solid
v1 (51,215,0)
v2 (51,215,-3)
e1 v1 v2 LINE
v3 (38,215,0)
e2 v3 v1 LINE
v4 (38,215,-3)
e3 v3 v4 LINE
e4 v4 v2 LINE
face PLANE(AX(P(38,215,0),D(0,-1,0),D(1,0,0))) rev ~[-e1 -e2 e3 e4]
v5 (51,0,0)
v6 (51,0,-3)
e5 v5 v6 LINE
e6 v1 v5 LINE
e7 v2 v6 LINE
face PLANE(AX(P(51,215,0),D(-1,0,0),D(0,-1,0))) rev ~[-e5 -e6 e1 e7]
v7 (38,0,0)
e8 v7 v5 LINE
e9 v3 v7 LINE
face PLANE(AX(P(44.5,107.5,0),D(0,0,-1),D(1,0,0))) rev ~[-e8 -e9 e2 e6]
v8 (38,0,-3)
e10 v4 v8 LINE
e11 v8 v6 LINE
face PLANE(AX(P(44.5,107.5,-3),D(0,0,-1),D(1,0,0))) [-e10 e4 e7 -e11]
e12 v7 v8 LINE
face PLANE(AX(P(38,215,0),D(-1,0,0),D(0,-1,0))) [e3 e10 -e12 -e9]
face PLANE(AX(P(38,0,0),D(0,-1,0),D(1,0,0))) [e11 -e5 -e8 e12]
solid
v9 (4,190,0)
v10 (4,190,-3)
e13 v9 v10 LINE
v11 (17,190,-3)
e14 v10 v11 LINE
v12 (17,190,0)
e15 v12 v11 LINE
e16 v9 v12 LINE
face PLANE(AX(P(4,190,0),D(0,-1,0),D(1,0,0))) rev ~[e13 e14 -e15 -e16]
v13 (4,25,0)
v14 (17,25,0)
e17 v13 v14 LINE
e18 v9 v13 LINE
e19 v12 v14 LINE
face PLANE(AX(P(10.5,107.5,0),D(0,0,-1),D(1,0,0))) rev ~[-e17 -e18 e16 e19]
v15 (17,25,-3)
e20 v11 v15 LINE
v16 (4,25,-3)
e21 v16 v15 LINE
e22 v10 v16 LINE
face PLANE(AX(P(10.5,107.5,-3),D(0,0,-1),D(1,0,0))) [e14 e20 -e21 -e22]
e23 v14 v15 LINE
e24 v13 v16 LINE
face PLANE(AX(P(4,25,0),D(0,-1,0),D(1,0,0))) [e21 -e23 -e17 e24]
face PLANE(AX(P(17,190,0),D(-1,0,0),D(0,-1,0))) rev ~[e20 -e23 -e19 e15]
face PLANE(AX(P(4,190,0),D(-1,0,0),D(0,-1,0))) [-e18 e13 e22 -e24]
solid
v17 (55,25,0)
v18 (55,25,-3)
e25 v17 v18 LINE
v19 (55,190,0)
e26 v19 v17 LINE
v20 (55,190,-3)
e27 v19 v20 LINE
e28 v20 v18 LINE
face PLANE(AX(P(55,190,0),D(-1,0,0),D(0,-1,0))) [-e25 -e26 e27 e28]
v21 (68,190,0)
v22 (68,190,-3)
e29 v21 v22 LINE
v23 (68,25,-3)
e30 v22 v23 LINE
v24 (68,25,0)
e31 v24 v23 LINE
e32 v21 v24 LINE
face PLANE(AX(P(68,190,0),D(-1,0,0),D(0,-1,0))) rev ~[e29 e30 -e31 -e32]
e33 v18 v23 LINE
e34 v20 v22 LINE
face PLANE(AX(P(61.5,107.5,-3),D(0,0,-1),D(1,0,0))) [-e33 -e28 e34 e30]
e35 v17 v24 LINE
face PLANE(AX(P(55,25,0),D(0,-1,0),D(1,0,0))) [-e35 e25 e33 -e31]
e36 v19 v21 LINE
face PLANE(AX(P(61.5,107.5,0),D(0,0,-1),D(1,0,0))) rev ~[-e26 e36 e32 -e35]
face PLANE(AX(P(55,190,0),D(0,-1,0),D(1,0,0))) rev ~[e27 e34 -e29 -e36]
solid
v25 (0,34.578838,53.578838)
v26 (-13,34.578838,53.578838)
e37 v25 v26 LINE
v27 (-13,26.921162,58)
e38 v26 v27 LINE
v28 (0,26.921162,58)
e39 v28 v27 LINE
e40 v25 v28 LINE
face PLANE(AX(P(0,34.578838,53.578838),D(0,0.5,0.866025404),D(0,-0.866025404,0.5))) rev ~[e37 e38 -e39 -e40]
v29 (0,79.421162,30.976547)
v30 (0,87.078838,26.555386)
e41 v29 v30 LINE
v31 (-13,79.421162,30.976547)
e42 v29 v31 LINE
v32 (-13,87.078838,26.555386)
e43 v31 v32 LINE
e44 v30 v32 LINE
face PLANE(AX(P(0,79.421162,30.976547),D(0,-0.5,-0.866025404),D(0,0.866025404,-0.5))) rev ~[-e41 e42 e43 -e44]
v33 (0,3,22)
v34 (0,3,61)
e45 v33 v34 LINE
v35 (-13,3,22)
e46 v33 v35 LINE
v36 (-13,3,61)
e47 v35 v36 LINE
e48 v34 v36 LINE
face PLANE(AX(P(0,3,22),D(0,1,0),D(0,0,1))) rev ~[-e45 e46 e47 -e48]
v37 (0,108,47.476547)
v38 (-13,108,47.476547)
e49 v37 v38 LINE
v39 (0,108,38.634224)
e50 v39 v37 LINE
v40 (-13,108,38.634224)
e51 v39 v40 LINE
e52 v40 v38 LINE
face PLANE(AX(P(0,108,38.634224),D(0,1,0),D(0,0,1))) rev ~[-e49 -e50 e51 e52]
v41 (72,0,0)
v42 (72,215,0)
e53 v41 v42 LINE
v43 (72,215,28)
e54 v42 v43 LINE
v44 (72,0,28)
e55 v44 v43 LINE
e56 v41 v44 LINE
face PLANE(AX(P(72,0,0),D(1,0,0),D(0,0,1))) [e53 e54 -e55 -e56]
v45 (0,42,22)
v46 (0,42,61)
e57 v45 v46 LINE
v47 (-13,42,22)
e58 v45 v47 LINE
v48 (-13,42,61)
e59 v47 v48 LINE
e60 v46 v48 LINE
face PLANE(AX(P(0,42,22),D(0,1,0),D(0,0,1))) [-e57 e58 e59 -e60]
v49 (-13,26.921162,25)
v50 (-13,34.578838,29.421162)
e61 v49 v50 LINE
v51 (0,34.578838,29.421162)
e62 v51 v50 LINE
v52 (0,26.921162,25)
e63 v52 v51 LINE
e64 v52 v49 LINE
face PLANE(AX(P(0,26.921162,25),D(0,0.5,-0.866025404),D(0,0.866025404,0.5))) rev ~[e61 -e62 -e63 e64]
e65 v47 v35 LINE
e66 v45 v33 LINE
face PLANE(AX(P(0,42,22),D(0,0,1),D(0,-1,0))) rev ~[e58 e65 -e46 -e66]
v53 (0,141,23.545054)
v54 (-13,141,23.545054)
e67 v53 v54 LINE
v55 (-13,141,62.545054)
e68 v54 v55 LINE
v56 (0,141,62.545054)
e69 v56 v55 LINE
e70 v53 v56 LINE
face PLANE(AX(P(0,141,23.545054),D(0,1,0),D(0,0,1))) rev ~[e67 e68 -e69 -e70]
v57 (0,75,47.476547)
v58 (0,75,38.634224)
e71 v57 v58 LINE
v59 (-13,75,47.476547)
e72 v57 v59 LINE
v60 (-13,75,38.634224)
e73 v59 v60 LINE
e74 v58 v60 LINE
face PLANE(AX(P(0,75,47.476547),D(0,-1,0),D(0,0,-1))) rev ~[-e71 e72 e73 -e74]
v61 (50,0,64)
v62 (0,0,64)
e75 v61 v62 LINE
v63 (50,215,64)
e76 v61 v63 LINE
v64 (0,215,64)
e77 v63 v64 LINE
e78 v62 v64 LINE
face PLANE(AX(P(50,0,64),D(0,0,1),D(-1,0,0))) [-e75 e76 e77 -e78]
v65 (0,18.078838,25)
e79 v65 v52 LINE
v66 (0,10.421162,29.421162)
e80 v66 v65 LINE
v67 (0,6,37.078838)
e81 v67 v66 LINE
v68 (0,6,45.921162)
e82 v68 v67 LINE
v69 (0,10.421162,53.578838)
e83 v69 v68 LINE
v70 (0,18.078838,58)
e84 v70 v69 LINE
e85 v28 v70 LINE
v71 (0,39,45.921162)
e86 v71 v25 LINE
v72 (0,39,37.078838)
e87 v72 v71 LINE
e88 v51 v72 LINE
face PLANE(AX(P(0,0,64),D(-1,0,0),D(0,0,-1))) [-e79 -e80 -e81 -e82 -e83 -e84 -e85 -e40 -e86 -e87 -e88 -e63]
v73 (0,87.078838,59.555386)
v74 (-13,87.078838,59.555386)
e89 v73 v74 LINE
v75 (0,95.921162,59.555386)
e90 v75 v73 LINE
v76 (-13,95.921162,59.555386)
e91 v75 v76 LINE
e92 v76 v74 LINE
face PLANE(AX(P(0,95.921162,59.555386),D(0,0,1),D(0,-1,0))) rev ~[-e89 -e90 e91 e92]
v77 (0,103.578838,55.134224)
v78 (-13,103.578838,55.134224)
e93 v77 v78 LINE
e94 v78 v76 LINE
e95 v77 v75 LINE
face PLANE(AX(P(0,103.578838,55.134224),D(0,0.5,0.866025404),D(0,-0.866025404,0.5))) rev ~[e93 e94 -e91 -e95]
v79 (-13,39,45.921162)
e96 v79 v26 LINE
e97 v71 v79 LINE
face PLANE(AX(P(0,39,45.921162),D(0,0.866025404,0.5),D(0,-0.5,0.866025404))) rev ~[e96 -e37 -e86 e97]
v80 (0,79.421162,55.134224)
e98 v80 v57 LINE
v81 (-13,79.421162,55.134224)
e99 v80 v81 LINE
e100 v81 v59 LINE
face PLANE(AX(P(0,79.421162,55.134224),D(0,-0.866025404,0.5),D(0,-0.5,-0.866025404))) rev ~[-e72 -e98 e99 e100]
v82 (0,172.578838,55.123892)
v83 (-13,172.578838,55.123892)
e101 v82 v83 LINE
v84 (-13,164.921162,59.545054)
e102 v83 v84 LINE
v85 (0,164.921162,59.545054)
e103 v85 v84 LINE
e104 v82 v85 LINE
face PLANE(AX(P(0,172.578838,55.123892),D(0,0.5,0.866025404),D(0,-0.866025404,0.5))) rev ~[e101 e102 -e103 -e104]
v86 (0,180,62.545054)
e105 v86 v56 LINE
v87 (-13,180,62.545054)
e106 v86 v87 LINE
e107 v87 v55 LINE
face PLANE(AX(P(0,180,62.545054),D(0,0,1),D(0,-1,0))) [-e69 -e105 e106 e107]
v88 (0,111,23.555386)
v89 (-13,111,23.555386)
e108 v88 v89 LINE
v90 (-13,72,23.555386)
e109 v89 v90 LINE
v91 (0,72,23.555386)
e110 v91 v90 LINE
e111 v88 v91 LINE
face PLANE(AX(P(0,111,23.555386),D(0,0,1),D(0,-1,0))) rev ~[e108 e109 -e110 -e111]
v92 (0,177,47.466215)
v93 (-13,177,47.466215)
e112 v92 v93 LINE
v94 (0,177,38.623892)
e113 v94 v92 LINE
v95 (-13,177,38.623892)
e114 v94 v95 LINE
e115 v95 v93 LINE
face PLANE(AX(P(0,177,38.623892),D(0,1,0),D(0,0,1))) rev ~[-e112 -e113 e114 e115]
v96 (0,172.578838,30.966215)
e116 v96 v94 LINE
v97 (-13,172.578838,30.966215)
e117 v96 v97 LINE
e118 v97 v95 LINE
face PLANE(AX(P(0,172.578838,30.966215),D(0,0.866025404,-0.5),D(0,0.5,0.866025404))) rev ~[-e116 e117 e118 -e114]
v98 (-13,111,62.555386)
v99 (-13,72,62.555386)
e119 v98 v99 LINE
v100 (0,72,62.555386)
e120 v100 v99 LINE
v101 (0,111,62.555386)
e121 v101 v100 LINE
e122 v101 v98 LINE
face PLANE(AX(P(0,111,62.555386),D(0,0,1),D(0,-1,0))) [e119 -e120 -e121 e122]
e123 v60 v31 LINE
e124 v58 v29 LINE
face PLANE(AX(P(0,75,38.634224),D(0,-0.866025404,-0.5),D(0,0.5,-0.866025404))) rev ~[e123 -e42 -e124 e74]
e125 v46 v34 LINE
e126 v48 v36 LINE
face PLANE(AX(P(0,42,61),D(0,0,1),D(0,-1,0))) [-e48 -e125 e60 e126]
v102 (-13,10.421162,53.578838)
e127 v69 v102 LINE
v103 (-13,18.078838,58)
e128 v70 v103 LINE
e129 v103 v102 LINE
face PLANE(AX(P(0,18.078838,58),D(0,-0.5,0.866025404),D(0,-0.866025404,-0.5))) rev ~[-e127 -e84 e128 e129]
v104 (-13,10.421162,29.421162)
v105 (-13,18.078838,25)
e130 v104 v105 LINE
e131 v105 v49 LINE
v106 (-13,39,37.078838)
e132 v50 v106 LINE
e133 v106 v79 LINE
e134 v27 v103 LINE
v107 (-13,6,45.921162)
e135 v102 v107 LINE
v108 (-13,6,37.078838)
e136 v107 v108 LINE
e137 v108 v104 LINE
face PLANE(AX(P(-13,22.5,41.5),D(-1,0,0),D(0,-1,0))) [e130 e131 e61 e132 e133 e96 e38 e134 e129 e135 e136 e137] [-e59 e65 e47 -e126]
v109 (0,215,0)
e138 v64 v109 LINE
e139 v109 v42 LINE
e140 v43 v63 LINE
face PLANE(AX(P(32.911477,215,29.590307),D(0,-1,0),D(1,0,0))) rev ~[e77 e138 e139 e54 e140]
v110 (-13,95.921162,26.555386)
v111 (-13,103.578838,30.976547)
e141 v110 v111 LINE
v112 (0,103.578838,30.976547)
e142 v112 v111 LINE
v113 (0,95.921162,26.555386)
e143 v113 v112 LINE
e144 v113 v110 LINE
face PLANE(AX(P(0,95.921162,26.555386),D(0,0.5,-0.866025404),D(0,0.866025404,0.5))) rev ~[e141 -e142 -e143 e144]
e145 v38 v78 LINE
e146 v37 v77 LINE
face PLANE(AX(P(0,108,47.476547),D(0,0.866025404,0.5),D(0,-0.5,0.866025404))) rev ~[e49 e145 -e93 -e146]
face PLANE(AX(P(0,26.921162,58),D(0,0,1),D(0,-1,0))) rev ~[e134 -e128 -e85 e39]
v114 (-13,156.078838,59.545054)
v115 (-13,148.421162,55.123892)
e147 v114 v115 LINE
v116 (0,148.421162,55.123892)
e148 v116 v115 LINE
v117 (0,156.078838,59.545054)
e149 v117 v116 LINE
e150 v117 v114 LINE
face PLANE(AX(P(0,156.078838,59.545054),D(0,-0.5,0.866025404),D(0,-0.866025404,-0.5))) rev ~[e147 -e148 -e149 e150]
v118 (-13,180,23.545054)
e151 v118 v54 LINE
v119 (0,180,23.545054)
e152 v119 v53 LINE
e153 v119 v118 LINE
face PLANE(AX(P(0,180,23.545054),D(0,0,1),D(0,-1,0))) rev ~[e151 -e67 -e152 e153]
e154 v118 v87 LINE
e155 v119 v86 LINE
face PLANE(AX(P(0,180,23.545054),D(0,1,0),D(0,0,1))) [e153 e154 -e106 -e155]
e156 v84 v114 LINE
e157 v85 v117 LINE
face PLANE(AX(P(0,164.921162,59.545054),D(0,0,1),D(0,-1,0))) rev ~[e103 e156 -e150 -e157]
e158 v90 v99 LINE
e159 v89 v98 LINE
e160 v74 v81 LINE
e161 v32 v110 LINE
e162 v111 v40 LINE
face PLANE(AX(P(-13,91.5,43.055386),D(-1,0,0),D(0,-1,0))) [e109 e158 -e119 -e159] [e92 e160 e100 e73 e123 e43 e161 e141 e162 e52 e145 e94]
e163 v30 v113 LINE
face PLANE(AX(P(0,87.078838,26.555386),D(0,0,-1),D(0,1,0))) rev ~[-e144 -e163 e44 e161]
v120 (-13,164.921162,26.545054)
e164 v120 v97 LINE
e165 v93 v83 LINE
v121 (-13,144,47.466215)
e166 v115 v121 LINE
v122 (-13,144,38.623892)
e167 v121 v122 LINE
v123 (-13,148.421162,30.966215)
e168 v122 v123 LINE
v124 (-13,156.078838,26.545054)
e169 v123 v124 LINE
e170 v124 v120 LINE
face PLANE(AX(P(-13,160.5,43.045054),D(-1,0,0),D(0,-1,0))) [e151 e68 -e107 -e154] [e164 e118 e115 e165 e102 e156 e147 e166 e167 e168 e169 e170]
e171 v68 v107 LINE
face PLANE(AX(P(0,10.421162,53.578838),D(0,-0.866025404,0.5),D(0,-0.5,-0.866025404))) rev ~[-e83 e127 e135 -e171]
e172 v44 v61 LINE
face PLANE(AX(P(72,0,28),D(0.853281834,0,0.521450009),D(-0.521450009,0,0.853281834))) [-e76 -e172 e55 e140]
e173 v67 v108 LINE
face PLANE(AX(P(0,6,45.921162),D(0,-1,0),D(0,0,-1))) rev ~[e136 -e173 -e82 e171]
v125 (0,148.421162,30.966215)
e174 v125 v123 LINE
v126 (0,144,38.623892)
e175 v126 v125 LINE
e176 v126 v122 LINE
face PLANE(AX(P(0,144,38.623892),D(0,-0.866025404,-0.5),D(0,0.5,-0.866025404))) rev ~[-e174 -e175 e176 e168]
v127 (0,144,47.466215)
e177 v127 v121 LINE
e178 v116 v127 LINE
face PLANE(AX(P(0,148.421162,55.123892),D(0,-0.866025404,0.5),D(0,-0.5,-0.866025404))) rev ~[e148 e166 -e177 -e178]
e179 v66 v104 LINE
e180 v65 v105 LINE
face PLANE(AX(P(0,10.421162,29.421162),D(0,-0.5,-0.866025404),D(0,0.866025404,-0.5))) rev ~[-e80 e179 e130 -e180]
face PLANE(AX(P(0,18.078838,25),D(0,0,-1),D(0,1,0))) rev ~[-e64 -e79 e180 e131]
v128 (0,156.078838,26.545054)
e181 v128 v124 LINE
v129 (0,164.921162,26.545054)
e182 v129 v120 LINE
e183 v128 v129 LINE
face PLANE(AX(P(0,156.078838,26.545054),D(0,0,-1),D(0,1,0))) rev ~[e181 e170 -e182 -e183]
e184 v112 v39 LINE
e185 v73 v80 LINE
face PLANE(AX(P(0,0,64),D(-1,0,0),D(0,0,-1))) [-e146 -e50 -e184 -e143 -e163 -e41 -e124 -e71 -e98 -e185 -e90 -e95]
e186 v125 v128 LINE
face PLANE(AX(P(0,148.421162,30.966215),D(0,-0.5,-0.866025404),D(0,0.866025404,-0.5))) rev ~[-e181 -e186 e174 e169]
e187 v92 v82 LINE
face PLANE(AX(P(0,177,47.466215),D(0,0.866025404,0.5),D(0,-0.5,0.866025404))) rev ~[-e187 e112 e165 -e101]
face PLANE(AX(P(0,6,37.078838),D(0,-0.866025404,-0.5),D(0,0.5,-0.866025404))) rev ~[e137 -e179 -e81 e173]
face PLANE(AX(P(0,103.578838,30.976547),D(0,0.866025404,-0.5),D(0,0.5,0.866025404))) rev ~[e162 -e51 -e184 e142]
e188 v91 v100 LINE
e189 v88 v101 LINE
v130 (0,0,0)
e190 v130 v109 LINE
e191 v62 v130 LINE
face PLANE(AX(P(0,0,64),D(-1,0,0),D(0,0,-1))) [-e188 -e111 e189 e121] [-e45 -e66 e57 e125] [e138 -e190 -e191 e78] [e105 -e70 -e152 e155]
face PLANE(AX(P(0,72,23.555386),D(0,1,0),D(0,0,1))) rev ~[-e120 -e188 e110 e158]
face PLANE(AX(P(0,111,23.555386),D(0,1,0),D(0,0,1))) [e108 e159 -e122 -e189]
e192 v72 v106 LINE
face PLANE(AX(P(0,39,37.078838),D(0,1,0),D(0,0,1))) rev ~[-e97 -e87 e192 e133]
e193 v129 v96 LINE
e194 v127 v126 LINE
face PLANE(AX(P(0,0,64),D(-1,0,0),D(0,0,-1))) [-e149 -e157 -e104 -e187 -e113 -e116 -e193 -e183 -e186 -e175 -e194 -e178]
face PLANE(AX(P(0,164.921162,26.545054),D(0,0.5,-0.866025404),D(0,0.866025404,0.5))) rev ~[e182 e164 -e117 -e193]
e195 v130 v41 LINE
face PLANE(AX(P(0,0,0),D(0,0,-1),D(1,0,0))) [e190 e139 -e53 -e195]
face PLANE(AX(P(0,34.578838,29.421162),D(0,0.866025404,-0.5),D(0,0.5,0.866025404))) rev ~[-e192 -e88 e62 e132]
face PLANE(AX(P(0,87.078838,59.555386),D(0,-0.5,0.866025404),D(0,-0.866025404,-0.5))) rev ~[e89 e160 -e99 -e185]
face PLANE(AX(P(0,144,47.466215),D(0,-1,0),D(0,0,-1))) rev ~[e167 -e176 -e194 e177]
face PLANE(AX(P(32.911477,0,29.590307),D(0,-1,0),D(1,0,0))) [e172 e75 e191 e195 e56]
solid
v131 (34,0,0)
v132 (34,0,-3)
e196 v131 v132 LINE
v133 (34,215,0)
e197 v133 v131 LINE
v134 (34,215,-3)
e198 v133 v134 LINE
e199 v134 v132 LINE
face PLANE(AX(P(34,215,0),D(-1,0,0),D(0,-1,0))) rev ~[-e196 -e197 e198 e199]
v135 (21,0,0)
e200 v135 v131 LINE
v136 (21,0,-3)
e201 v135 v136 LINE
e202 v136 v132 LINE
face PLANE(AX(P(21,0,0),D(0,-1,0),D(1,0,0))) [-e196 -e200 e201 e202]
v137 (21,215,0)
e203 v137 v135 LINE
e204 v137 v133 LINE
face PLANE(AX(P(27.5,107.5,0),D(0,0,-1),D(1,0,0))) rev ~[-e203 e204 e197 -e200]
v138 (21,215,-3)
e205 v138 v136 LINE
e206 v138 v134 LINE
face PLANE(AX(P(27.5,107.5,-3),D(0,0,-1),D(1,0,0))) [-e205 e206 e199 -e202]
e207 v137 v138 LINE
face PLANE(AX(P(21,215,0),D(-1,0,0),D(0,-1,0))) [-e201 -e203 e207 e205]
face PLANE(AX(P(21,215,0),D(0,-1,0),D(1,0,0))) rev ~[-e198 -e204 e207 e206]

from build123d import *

# Parameters (mm, degrees)
F1_DEPTH = 215
F2_W     = 39
F2_H     = 39
F3_DEPTH = 13
F4_W     = 39
F4_H     = 39
F5_DEPTH = 13
F6_W     = 13
F6_H     = 215
F7_DEPTH = 3
F6_H_2   = 165


with BuildPart() as f1:
    # F0 (on Front) → F1 (new body)
    with BuildSketch(Plane.XZ):
        Polygon((0, 64), (0, 0), (72, 0), (72, 28), (50, 64), align=None)
    extrude(amount=-F1_DEPTH)

    # F2 (on face) → F3 (join)
    with BuildSketch(Plane(origin=(0, 0, 0), x_dir=(0, -1, 0), z_dir=(-1, 0, 0))):
        with Locations((-22.5, 41.5)):
            Rectangle(F2_W, F2_H)
        Polygon((-26.9211616751, 58), (-18.0788383249, 58), (-10.4211616751, 53.5788383249), (-6, 45.9211616751), (-6, 37.0788383249), (-10.4211616751, 29.4211616751), (-18.0788383249, 25), (-26.9211616751, 25), (-34.5788383249, 29.4211616751), (-39, 37.0788383249), (-39, 45.9211616751), (-34.5788383249, 53.5788383249), align=None, mode=Mode.SUBTRACT)
    extrude(amount=F3_DEPTH)

    # F4 (on face) → F5 (join, through all)
    with BuildSketch(Plane(origin=(0, 0, 0), x_dir=(0, -1, 0), z_dir=(-1, 0, 0))):
        with Locations((-91.5, 43.0553856975)):
            Rectangle(F4_W, F4_H)
        Polygon((-95.9211616751, 59.5553856975), (-87.0788383249, 59.5553856975), (-79.4211616751, 55.1342240224), (-75, 47.4765473726), (-75, 38.6342240224), (-79.4211616751, 30.9765473726), (-87.0788383249, 26.5553856975), (-95.9211616751, 26.5553856975), (-103.5788383249, 30.9765473726), (-108, 38.6342240224), (-108, 47.4765473726), (-103.5788383249, 55.1342240224), align=None, mode=Mode.SUBTRACT)
        with Locations((-160.5, 43.0450536048)):
            Rectangle(F4_W, F4_H)
        Polygon((-164.9211616751, 59.5450536048), (-156.0788383249, 59.5450536048), (-148.4211616751, 55.1238919297), (-144, 47.4662152799), (-144, 38.6238919297), (-148.4211616751, 30.9662152799), (-156.0788383249, 26.5450536048), (-164.9211616751, 26.5450536048), (-172.5788383249, 30.9662152799), (-177, 38.6238919297), (-177, 47.4662152799), (-172.5788383249, 55.1238919297), align=None, mode=Mode.SUBTRACT)
    extrude(amount=F5_DEPTH)


with BuildPart() as f7:
    # F6 (on face) → F7 (new body)
    with BuildSketch(Plane(origin=(0, 0, 0), x_dir=(1, 0, 0), z_dir=(0, 0, -1))):
        with Locations((27.5, -107.5)):
            Rectangle(F6_W, F6_H)
    extrude(amount=F7_DEPTH)


with BuildPart() as f7b:
    # F6 (on face) → F7, piece 2 (new body)
    with BuildSketch(Plane(origin=(0, 0, 0), x_dir=(1, 0, 0), z_dir=(0, 0, -1))):
        with Locations((44.5, -107.5)):
            Rectangle(F6_W, F6_H)
    extrude(amount=F7_DEPTH)


with BuildPart() as f7c:
    # F6 (on face) → F7, piece 3 (new body)
    with BuildSketch(Plane(origin=(0, 0, 0), x_dir=(1, 0, 0), z_dir=(0, 0, -1))):
        with Locations((10.5, -107.5)):
            Rectangle(F6_W, F6_H_2)
    extrude(amount=F7_DEPTH)


with BuildPart() as f7d:
    # F6 (on face) → F7, piece 4 (new body)
    with BuildSketch(Plane(origin=(0, 0, 0), x_dir=(1, 0, 0), z_dir=(0, 0, -1))):
        with Locations((61.5, -107.5)):
            Rectangle(F6_W, F6_H_2)
    extrude(amount=F7_DEPTH)


solid = Compound([f1.part, f7.part, f7b.part, f7c.part, f7d.part])
